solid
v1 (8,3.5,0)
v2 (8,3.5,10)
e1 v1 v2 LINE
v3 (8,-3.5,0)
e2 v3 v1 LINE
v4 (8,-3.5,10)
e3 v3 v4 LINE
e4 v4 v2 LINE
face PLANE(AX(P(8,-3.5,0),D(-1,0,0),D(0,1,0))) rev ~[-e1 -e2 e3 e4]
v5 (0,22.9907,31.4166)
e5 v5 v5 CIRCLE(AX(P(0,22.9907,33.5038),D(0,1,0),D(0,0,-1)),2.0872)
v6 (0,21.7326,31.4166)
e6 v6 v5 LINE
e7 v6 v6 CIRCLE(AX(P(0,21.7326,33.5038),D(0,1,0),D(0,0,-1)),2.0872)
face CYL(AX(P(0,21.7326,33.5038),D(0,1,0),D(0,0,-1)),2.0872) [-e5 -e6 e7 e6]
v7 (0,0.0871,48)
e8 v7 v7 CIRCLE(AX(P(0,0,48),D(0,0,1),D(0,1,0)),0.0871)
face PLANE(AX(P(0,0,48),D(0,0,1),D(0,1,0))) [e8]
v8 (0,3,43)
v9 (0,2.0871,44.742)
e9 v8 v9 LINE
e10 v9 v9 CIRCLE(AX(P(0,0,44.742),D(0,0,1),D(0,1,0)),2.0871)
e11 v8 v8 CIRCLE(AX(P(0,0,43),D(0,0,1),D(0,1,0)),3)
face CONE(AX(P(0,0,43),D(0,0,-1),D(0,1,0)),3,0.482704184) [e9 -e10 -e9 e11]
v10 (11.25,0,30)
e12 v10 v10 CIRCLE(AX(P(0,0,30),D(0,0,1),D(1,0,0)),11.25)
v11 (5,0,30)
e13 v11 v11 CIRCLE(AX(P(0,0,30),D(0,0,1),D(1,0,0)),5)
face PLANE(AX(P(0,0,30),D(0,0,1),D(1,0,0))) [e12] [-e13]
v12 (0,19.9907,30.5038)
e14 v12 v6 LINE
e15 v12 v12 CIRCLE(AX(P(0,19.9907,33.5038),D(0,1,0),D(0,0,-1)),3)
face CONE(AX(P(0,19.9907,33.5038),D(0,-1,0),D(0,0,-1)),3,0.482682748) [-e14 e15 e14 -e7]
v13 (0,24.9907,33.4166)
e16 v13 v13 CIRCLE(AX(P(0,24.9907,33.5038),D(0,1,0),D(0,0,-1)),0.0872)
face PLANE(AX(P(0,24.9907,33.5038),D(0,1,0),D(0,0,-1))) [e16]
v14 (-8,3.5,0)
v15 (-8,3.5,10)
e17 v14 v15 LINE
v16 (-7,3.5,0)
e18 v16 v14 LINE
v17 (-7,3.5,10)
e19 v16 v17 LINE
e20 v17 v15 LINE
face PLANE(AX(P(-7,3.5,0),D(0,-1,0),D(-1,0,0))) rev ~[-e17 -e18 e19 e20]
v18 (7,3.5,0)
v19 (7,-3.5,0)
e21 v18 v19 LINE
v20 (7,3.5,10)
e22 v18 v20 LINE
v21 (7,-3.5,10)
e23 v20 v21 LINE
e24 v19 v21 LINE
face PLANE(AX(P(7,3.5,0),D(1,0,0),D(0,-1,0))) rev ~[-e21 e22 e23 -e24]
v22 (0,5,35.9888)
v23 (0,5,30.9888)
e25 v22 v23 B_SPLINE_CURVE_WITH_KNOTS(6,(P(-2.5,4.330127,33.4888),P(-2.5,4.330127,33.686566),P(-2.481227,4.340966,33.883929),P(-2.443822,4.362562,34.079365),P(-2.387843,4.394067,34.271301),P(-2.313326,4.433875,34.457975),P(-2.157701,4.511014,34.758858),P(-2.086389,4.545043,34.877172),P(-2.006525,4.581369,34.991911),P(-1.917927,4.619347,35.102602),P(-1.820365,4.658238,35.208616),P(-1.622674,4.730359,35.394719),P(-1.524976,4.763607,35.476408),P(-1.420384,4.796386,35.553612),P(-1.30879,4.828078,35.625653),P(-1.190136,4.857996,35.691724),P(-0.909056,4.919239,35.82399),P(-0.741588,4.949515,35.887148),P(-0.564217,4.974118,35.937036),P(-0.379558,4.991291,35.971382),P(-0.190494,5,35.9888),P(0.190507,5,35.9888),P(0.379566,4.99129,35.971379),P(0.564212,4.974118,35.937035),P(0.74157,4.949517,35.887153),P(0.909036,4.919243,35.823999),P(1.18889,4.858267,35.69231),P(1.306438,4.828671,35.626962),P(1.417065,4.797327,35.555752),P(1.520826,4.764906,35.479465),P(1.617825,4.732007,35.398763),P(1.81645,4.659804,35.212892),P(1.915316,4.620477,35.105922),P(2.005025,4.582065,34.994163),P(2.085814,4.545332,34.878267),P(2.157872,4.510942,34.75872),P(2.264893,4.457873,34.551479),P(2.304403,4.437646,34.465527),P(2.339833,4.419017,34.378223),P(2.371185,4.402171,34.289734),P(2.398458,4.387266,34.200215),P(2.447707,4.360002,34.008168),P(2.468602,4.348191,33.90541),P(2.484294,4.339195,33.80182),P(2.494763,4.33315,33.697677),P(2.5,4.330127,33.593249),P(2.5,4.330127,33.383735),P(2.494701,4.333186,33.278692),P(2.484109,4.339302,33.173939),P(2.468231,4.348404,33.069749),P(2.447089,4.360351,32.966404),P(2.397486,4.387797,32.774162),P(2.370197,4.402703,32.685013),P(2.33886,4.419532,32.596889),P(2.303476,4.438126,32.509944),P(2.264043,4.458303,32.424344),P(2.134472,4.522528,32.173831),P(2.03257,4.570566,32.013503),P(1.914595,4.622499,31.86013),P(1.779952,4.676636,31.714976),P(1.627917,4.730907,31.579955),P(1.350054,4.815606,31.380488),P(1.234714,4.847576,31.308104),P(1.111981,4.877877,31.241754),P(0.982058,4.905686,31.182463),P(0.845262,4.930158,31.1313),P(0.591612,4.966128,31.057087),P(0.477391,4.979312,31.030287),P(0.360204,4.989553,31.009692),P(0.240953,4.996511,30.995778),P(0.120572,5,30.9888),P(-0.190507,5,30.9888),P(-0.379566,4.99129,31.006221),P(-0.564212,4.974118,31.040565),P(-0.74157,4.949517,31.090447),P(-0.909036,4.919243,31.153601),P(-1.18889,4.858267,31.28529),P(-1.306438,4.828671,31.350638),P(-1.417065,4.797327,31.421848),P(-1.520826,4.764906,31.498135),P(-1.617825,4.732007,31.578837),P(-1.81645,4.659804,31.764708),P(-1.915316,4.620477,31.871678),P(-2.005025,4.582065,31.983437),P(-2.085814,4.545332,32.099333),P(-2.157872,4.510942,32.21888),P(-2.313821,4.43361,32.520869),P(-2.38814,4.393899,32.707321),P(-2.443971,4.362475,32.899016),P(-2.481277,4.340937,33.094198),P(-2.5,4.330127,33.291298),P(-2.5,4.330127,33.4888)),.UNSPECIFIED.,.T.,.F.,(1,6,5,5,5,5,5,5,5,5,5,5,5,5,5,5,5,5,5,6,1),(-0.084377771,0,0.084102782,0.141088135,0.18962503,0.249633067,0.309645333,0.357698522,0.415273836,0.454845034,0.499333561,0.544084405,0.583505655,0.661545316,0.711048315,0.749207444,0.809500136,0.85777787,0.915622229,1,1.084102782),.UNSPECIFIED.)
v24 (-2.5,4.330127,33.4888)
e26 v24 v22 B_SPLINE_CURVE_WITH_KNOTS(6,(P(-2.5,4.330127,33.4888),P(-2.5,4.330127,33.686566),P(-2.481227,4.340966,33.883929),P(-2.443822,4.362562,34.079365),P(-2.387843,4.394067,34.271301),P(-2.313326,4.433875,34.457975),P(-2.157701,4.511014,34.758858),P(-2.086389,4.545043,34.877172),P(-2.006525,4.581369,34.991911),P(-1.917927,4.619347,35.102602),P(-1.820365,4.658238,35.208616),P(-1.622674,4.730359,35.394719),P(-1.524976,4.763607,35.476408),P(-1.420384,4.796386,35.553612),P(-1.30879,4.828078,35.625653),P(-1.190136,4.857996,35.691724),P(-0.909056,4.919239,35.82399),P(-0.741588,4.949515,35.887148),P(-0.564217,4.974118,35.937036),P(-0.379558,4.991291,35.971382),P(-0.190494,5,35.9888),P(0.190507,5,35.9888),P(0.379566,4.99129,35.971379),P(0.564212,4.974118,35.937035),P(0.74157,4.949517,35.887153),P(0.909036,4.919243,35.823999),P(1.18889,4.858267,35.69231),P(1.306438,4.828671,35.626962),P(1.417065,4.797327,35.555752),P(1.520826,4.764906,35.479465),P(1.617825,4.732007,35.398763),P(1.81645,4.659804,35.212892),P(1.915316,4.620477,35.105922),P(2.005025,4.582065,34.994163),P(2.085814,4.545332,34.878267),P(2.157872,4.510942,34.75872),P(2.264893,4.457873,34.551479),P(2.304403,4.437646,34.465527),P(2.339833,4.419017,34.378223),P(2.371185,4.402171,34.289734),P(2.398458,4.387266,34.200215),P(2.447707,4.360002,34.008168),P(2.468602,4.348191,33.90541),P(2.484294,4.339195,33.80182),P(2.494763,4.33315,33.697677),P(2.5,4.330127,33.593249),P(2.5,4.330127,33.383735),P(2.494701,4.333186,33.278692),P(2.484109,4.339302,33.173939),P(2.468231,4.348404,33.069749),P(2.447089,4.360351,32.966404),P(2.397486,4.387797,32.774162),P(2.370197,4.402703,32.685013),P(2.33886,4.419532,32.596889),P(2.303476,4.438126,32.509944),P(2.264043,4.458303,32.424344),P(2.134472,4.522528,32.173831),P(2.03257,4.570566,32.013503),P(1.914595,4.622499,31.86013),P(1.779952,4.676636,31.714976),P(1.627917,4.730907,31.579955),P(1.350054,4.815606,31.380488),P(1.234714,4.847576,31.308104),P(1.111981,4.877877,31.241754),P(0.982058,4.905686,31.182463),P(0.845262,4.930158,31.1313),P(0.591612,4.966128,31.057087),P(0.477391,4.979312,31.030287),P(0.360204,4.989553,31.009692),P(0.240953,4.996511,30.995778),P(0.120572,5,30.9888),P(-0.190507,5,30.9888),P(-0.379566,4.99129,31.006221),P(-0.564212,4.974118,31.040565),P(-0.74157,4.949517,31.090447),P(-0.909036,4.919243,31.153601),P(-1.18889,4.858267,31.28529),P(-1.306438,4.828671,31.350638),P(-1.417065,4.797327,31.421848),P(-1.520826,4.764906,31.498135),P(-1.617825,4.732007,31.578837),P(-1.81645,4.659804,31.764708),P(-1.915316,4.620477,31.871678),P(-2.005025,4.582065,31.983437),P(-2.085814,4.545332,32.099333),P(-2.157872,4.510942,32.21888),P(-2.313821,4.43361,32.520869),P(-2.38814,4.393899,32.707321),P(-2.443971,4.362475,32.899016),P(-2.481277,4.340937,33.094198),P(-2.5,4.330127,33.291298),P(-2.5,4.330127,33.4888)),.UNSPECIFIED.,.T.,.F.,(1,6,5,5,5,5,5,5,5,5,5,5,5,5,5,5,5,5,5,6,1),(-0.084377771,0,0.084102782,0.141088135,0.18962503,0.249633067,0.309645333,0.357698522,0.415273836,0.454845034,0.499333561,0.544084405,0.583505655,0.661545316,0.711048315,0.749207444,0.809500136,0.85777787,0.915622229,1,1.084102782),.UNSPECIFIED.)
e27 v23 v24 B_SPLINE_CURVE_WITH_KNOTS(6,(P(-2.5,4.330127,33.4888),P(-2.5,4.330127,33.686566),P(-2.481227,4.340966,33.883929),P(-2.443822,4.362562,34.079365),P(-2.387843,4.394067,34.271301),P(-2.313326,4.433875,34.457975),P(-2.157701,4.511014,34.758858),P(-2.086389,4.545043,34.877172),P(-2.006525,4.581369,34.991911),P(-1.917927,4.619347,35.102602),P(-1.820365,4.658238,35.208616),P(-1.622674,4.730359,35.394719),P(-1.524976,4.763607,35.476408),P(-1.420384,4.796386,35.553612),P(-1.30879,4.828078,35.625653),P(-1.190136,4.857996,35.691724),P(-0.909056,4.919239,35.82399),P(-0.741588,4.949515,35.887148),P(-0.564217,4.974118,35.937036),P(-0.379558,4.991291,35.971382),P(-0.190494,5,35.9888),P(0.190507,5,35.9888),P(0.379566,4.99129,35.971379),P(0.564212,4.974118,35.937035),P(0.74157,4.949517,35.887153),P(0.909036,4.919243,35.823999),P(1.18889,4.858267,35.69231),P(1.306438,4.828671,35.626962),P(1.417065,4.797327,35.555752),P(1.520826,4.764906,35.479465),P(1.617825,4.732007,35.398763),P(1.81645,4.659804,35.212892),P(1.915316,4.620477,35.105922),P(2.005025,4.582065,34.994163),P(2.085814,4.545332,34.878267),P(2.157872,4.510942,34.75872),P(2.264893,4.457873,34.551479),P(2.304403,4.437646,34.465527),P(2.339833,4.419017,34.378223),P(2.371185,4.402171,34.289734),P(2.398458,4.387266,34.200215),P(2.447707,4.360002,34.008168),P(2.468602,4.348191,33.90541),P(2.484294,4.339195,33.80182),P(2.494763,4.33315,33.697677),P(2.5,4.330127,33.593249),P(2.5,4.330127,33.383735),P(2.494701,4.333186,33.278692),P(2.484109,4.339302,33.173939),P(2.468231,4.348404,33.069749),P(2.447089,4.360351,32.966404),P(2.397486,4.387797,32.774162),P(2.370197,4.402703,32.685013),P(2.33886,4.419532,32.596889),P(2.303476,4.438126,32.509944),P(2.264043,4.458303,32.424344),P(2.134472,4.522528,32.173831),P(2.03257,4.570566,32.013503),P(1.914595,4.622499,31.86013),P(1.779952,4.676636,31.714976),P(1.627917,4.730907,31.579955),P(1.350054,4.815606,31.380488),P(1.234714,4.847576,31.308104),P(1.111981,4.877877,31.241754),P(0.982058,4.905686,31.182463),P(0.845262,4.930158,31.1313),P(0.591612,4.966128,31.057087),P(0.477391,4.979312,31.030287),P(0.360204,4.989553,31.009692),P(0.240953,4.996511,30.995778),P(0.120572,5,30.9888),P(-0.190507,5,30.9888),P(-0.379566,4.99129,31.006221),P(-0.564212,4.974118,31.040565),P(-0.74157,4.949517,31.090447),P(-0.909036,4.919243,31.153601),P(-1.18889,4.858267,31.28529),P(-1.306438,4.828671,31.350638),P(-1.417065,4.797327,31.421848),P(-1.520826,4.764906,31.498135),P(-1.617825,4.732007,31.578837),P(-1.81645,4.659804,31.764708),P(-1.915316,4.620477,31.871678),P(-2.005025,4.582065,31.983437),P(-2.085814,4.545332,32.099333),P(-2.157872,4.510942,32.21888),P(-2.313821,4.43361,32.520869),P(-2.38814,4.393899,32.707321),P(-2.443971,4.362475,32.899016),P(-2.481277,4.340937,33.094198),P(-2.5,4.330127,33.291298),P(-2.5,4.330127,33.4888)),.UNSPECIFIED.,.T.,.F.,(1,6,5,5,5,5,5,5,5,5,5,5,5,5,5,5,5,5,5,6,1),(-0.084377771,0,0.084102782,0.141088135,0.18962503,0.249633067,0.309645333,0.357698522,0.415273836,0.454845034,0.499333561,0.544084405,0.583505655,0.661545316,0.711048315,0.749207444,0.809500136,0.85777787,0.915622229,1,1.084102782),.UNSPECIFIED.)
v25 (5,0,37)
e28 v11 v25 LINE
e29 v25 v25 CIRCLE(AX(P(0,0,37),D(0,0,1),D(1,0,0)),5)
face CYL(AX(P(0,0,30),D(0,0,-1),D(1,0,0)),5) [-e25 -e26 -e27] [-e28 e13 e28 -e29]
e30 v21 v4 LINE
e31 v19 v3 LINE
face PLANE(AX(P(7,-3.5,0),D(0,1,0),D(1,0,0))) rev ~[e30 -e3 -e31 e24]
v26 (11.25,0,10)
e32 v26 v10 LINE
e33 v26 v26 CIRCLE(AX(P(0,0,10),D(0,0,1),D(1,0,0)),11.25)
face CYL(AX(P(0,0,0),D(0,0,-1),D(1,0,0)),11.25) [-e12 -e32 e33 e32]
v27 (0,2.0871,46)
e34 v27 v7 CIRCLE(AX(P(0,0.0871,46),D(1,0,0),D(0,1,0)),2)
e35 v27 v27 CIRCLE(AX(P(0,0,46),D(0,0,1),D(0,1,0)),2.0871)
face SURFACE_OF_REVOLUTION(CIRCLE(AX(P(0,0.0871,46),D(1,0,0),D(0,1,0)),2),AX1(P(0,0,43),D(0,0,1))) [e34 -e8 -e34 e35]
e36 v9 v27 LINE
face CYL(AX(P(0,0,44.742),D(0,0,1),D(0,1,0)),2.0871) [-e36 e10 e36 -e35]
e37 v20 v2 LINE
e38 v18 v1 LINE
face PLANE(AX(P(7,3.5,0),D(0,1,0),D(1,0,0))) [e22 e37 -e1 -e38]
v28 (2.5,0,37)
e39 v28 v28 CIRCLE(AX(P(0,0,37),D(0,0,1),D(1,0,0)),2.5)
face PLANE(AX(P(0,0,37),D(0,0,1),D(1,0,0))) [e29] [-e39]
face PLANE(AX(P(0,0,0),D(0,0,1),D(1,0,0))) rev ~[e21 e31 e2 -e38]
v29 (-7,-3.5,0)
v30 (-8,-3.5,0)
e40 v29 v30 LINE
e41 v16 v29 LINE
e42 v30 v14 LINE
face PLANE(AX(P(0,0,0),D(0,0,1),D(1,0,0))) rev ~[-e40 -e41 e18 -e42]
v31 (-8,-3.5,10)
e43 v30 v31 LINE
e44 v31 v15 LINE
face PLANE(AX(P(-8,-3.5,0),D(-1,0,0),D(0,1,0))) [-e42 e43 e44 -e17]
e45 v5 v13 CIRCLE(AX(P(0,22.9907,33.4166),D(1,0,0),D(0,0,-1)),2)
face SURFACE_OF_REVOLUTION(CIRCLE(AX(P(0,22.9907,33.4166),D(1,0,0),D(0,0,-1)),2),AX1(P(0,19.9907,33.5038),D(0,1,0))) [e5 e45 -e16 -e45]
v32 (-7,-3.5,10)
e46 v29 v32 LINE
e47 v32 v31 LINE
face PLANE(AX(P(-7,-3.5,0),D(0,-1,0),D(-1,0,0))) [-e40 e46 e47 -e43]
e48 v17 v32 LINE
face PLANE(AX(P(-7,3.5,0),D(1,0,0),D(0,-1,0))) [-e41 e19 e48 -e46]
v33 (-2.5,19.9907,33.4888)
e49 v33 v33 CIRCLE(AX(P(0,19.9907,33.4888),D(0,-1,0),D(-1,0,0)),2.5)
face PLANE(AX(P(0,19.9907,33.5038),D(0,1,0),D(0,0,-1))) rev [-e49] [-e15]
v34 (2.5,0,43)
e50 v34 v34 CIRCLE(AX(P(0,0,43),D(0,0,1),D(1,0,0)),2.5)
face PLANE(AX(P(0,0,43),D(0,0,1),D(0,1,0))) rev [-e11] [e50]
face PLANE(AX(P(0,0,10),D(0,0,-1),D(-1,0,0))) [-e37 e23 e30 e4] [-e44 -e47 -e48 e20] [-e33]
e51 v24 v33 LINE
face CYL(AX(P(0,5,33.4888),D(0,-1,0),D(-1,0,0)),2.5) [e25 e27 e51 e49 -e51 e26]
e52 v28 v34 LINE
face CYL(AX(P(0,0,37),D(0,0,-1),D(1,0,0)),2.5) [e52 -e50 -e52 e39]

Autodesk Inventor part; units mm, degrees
ref_plane "XY Plane" through (0, 0, 0) normal (0, 0, 1) x (1, 0, 0)
sketch "Block1" plane through (0, 0, 0) normal (0, 0, 1) x (1, 0, 0)
  line L0 (-0.685, 86) -> (2.315, 86)
  line L1 (-0.685, 86) -> (-0.685, 91)
  line L2 (2.315, 86) -> (1.4022, 87.742)
  line L3 (1.4022, 87.742) -> (1.4022, 89)
  line L4 (-0.5978, 91) -> (-0.685, 91)
  arc A0 (1.4022, 89) -> (-0.5978, 91) centre (-0.5978, 89) ccw
  point P0 (0.6511, 88.4856)
  dimension "d9" = 3
  dimension "d10" = 5
  dimension "d11" = 2
  dimension "d14" = 152.344
  dimension "d15" = 2.0871
sketch "Skizze1" plane through (0, 0, 0) normal (0, 0, 1) x (1, 0, 0)
  point P0 (0, 0)
sketch "Skizze2" plane through (0, 0, 0) normal (0, 0, 1) x (1, 0, 0)
  circle A0 centre (0, 0) radius 11.25
  dimension "d0" = 22.5
extrude "Extrusion1" add sketch "Skizze2" along normal blind 30
sketch "Skizze3" plane through (0, 0, 30) normal (0, 0, 1) x (1, 0, 0)
  circle A0 centre (0, 0) radius 11.25 projected
  circle A1 centre (0, 0) radius 5
  dimension "d3" = 10
extrude "Extrusion2" add sketch "Skizze3" along normal blind 7 contours A1
sketch "Skizze4" plane through (0, 0, 37) normal (0, 0, 1) x (1, 0, 0)
  circle A0 centre (0, 0) radius 5 projected
  circle A1 centre (0, 0) radius 2.5
  dimension "d6" = 5
extrude "Extrusion3" add sketch "Skizze4" along normal blind 6 contours A1
sketch "Skizze5" plane through (0, 0, 0) normal (1, 0, 0) x (0, 1, 0)
  line L0 (2.5, 43) -> (-2.5, 43) projected
  line L1 (-2.5, 43) -> (2.5, 43) construction
  line L2 (0, 43) -> (3, 43)
  line L3 (0, 43) -> (0, 48)
  line L4 (3, 43) -> (2.0871, 44.742)
  line L5 (2.0871, 44.742) -> (2.0871, 46)
  line L6 (0.0871, 48) -> (0, 48)
  arc A0 (2.0871, 46) -> (0.0871, 48) centre (0.0871, 46) ccw
  point P0 (0, 0)
sketch "Skizze6" plane through (0, 0, 0) normal (0, 0, -1) x (-1, 0, 0)
  circle A0 centre (0, 0) radius 11.25 projected
  line L0 (7, 3.5) -> (7, -3.5)
  line L1 (7, -3.5) -> (8, -3.5)
  line L2 (7, 3.5) -> (8, 3.5)
  line L3 (8, -3.5) -> (8, 3.5)
  line L4 (0, 11.25) -> (0, -11.25) construction
  line L5 (-7, 3.5) -> (-7, -3.5)
  line L6 (-7, -3.5) -> (-8, -3.5)
  line L7 (-7, 3.5) -> (-8, 3.5)
  line L8 (-8, -3.5) -> (-8, 3.5)
  dimension "d19" = 7
  dimension "d20" = 1
  dimension "d21" = 7
  dimension "d23" = 3.5
extrude "Extrusion4" cut sketch "Skizze6" against normal blind 10
revolve "Umdrehung2" add sketch "Skizze5" angle 360 about axis through (0, 0, 43) along (0, 0, 1)
ref_plane "Arbeitsebene2" through (0, 5, 30) normal (0, 1, 0) x (-1, 0, 0)
ref_plane "Arbeitsebene1" through (0, 5, 30) normal (0, 1, 0) x (-1, 0, 0)
sketch "Skizze7" plane through (0, 5, 30) normal (0, 1, 0) x (-1, 0, 0)
  circle A0 centre (0, 3.4888) radius 2.5
  point P0 (0, -30)
  dimension "d27" = 5
extrude "Extrusion5" add sketch "Skizze7" along normal blind 15 and the other way blind 3
sketch "Skizze9" plane through (0, 0, 0) normal (1, 0, 0) x (0, 1, 0)
  point P0 (0, 0)
sketch "Skizze10" plane through (0, 0, 0) normal (1, 0, 0) x (0, 1, 0)
  point P0 (0, 0)
ref_plane "Arbeitsebene6" through (0, 0, 0) normal (1, 0, 0) x (0, 1, 0)
ref_plane "Arbeitsebene7" through (0, 20, 33.4888) normal (0, 1, 0) x (1, 0, 0)
sketch "Skizze11" plane through (0, 0, 0) normal (1, 0, 0) x (0, 1, 0)
  point P0 (0, 0)
sketch "Skizze12" plane through (0, 0, 0) normal (1, 0, 0) x (0, 1, 0)
  line L0 (0, 0) -> (0, 41.8024) construction
sketch "Skizze13" plane through (0, 0, 0) normal (1, 0, 0) x (0, 1, 0)
  line L0 (0, 43) -> (3, 43)
  line L1 (0, 43) -> (0, 48)
  line L2 (3, 43) -> (2.0871, 44.742)
  line L3 (2.0871, 44.742) -> (2.0871, 46)
  line L4 (0.0871, 48) -> (0, 48)
  arc A0 (2.0871, 46) -> (0.0871, 48) centre (0.0871, 46) ccw
  line L5 (19.9907, 33.5038) -> (19.9907, 30.5038)
  line L6 (19.9907, 33.5038) -> (24.9907, 33.5038)
  line L7 (19.9907, 30.5038) -> (21.7326, 31.4166)
  line L8 (21.7326, 31.4166) -> (22.9907, 31.4166)
  line L9 (24.9907, 33.4166) -> (24.9907, 33.5038)
  arc A1 (22.9907, 31.4166) -> (24.9907, 33.4166) centre (22.9907, 33.4166) ccw
  point P0 (0, 0)
revolve "Umdrehung3" add sketch "Skizze13" angle 360 about axis through (0, 19.9907, 33.5038) along (0, 1, 0) contours L6 L9 A1 L8 L7 L5
properties part number "Ventil_CPY"
